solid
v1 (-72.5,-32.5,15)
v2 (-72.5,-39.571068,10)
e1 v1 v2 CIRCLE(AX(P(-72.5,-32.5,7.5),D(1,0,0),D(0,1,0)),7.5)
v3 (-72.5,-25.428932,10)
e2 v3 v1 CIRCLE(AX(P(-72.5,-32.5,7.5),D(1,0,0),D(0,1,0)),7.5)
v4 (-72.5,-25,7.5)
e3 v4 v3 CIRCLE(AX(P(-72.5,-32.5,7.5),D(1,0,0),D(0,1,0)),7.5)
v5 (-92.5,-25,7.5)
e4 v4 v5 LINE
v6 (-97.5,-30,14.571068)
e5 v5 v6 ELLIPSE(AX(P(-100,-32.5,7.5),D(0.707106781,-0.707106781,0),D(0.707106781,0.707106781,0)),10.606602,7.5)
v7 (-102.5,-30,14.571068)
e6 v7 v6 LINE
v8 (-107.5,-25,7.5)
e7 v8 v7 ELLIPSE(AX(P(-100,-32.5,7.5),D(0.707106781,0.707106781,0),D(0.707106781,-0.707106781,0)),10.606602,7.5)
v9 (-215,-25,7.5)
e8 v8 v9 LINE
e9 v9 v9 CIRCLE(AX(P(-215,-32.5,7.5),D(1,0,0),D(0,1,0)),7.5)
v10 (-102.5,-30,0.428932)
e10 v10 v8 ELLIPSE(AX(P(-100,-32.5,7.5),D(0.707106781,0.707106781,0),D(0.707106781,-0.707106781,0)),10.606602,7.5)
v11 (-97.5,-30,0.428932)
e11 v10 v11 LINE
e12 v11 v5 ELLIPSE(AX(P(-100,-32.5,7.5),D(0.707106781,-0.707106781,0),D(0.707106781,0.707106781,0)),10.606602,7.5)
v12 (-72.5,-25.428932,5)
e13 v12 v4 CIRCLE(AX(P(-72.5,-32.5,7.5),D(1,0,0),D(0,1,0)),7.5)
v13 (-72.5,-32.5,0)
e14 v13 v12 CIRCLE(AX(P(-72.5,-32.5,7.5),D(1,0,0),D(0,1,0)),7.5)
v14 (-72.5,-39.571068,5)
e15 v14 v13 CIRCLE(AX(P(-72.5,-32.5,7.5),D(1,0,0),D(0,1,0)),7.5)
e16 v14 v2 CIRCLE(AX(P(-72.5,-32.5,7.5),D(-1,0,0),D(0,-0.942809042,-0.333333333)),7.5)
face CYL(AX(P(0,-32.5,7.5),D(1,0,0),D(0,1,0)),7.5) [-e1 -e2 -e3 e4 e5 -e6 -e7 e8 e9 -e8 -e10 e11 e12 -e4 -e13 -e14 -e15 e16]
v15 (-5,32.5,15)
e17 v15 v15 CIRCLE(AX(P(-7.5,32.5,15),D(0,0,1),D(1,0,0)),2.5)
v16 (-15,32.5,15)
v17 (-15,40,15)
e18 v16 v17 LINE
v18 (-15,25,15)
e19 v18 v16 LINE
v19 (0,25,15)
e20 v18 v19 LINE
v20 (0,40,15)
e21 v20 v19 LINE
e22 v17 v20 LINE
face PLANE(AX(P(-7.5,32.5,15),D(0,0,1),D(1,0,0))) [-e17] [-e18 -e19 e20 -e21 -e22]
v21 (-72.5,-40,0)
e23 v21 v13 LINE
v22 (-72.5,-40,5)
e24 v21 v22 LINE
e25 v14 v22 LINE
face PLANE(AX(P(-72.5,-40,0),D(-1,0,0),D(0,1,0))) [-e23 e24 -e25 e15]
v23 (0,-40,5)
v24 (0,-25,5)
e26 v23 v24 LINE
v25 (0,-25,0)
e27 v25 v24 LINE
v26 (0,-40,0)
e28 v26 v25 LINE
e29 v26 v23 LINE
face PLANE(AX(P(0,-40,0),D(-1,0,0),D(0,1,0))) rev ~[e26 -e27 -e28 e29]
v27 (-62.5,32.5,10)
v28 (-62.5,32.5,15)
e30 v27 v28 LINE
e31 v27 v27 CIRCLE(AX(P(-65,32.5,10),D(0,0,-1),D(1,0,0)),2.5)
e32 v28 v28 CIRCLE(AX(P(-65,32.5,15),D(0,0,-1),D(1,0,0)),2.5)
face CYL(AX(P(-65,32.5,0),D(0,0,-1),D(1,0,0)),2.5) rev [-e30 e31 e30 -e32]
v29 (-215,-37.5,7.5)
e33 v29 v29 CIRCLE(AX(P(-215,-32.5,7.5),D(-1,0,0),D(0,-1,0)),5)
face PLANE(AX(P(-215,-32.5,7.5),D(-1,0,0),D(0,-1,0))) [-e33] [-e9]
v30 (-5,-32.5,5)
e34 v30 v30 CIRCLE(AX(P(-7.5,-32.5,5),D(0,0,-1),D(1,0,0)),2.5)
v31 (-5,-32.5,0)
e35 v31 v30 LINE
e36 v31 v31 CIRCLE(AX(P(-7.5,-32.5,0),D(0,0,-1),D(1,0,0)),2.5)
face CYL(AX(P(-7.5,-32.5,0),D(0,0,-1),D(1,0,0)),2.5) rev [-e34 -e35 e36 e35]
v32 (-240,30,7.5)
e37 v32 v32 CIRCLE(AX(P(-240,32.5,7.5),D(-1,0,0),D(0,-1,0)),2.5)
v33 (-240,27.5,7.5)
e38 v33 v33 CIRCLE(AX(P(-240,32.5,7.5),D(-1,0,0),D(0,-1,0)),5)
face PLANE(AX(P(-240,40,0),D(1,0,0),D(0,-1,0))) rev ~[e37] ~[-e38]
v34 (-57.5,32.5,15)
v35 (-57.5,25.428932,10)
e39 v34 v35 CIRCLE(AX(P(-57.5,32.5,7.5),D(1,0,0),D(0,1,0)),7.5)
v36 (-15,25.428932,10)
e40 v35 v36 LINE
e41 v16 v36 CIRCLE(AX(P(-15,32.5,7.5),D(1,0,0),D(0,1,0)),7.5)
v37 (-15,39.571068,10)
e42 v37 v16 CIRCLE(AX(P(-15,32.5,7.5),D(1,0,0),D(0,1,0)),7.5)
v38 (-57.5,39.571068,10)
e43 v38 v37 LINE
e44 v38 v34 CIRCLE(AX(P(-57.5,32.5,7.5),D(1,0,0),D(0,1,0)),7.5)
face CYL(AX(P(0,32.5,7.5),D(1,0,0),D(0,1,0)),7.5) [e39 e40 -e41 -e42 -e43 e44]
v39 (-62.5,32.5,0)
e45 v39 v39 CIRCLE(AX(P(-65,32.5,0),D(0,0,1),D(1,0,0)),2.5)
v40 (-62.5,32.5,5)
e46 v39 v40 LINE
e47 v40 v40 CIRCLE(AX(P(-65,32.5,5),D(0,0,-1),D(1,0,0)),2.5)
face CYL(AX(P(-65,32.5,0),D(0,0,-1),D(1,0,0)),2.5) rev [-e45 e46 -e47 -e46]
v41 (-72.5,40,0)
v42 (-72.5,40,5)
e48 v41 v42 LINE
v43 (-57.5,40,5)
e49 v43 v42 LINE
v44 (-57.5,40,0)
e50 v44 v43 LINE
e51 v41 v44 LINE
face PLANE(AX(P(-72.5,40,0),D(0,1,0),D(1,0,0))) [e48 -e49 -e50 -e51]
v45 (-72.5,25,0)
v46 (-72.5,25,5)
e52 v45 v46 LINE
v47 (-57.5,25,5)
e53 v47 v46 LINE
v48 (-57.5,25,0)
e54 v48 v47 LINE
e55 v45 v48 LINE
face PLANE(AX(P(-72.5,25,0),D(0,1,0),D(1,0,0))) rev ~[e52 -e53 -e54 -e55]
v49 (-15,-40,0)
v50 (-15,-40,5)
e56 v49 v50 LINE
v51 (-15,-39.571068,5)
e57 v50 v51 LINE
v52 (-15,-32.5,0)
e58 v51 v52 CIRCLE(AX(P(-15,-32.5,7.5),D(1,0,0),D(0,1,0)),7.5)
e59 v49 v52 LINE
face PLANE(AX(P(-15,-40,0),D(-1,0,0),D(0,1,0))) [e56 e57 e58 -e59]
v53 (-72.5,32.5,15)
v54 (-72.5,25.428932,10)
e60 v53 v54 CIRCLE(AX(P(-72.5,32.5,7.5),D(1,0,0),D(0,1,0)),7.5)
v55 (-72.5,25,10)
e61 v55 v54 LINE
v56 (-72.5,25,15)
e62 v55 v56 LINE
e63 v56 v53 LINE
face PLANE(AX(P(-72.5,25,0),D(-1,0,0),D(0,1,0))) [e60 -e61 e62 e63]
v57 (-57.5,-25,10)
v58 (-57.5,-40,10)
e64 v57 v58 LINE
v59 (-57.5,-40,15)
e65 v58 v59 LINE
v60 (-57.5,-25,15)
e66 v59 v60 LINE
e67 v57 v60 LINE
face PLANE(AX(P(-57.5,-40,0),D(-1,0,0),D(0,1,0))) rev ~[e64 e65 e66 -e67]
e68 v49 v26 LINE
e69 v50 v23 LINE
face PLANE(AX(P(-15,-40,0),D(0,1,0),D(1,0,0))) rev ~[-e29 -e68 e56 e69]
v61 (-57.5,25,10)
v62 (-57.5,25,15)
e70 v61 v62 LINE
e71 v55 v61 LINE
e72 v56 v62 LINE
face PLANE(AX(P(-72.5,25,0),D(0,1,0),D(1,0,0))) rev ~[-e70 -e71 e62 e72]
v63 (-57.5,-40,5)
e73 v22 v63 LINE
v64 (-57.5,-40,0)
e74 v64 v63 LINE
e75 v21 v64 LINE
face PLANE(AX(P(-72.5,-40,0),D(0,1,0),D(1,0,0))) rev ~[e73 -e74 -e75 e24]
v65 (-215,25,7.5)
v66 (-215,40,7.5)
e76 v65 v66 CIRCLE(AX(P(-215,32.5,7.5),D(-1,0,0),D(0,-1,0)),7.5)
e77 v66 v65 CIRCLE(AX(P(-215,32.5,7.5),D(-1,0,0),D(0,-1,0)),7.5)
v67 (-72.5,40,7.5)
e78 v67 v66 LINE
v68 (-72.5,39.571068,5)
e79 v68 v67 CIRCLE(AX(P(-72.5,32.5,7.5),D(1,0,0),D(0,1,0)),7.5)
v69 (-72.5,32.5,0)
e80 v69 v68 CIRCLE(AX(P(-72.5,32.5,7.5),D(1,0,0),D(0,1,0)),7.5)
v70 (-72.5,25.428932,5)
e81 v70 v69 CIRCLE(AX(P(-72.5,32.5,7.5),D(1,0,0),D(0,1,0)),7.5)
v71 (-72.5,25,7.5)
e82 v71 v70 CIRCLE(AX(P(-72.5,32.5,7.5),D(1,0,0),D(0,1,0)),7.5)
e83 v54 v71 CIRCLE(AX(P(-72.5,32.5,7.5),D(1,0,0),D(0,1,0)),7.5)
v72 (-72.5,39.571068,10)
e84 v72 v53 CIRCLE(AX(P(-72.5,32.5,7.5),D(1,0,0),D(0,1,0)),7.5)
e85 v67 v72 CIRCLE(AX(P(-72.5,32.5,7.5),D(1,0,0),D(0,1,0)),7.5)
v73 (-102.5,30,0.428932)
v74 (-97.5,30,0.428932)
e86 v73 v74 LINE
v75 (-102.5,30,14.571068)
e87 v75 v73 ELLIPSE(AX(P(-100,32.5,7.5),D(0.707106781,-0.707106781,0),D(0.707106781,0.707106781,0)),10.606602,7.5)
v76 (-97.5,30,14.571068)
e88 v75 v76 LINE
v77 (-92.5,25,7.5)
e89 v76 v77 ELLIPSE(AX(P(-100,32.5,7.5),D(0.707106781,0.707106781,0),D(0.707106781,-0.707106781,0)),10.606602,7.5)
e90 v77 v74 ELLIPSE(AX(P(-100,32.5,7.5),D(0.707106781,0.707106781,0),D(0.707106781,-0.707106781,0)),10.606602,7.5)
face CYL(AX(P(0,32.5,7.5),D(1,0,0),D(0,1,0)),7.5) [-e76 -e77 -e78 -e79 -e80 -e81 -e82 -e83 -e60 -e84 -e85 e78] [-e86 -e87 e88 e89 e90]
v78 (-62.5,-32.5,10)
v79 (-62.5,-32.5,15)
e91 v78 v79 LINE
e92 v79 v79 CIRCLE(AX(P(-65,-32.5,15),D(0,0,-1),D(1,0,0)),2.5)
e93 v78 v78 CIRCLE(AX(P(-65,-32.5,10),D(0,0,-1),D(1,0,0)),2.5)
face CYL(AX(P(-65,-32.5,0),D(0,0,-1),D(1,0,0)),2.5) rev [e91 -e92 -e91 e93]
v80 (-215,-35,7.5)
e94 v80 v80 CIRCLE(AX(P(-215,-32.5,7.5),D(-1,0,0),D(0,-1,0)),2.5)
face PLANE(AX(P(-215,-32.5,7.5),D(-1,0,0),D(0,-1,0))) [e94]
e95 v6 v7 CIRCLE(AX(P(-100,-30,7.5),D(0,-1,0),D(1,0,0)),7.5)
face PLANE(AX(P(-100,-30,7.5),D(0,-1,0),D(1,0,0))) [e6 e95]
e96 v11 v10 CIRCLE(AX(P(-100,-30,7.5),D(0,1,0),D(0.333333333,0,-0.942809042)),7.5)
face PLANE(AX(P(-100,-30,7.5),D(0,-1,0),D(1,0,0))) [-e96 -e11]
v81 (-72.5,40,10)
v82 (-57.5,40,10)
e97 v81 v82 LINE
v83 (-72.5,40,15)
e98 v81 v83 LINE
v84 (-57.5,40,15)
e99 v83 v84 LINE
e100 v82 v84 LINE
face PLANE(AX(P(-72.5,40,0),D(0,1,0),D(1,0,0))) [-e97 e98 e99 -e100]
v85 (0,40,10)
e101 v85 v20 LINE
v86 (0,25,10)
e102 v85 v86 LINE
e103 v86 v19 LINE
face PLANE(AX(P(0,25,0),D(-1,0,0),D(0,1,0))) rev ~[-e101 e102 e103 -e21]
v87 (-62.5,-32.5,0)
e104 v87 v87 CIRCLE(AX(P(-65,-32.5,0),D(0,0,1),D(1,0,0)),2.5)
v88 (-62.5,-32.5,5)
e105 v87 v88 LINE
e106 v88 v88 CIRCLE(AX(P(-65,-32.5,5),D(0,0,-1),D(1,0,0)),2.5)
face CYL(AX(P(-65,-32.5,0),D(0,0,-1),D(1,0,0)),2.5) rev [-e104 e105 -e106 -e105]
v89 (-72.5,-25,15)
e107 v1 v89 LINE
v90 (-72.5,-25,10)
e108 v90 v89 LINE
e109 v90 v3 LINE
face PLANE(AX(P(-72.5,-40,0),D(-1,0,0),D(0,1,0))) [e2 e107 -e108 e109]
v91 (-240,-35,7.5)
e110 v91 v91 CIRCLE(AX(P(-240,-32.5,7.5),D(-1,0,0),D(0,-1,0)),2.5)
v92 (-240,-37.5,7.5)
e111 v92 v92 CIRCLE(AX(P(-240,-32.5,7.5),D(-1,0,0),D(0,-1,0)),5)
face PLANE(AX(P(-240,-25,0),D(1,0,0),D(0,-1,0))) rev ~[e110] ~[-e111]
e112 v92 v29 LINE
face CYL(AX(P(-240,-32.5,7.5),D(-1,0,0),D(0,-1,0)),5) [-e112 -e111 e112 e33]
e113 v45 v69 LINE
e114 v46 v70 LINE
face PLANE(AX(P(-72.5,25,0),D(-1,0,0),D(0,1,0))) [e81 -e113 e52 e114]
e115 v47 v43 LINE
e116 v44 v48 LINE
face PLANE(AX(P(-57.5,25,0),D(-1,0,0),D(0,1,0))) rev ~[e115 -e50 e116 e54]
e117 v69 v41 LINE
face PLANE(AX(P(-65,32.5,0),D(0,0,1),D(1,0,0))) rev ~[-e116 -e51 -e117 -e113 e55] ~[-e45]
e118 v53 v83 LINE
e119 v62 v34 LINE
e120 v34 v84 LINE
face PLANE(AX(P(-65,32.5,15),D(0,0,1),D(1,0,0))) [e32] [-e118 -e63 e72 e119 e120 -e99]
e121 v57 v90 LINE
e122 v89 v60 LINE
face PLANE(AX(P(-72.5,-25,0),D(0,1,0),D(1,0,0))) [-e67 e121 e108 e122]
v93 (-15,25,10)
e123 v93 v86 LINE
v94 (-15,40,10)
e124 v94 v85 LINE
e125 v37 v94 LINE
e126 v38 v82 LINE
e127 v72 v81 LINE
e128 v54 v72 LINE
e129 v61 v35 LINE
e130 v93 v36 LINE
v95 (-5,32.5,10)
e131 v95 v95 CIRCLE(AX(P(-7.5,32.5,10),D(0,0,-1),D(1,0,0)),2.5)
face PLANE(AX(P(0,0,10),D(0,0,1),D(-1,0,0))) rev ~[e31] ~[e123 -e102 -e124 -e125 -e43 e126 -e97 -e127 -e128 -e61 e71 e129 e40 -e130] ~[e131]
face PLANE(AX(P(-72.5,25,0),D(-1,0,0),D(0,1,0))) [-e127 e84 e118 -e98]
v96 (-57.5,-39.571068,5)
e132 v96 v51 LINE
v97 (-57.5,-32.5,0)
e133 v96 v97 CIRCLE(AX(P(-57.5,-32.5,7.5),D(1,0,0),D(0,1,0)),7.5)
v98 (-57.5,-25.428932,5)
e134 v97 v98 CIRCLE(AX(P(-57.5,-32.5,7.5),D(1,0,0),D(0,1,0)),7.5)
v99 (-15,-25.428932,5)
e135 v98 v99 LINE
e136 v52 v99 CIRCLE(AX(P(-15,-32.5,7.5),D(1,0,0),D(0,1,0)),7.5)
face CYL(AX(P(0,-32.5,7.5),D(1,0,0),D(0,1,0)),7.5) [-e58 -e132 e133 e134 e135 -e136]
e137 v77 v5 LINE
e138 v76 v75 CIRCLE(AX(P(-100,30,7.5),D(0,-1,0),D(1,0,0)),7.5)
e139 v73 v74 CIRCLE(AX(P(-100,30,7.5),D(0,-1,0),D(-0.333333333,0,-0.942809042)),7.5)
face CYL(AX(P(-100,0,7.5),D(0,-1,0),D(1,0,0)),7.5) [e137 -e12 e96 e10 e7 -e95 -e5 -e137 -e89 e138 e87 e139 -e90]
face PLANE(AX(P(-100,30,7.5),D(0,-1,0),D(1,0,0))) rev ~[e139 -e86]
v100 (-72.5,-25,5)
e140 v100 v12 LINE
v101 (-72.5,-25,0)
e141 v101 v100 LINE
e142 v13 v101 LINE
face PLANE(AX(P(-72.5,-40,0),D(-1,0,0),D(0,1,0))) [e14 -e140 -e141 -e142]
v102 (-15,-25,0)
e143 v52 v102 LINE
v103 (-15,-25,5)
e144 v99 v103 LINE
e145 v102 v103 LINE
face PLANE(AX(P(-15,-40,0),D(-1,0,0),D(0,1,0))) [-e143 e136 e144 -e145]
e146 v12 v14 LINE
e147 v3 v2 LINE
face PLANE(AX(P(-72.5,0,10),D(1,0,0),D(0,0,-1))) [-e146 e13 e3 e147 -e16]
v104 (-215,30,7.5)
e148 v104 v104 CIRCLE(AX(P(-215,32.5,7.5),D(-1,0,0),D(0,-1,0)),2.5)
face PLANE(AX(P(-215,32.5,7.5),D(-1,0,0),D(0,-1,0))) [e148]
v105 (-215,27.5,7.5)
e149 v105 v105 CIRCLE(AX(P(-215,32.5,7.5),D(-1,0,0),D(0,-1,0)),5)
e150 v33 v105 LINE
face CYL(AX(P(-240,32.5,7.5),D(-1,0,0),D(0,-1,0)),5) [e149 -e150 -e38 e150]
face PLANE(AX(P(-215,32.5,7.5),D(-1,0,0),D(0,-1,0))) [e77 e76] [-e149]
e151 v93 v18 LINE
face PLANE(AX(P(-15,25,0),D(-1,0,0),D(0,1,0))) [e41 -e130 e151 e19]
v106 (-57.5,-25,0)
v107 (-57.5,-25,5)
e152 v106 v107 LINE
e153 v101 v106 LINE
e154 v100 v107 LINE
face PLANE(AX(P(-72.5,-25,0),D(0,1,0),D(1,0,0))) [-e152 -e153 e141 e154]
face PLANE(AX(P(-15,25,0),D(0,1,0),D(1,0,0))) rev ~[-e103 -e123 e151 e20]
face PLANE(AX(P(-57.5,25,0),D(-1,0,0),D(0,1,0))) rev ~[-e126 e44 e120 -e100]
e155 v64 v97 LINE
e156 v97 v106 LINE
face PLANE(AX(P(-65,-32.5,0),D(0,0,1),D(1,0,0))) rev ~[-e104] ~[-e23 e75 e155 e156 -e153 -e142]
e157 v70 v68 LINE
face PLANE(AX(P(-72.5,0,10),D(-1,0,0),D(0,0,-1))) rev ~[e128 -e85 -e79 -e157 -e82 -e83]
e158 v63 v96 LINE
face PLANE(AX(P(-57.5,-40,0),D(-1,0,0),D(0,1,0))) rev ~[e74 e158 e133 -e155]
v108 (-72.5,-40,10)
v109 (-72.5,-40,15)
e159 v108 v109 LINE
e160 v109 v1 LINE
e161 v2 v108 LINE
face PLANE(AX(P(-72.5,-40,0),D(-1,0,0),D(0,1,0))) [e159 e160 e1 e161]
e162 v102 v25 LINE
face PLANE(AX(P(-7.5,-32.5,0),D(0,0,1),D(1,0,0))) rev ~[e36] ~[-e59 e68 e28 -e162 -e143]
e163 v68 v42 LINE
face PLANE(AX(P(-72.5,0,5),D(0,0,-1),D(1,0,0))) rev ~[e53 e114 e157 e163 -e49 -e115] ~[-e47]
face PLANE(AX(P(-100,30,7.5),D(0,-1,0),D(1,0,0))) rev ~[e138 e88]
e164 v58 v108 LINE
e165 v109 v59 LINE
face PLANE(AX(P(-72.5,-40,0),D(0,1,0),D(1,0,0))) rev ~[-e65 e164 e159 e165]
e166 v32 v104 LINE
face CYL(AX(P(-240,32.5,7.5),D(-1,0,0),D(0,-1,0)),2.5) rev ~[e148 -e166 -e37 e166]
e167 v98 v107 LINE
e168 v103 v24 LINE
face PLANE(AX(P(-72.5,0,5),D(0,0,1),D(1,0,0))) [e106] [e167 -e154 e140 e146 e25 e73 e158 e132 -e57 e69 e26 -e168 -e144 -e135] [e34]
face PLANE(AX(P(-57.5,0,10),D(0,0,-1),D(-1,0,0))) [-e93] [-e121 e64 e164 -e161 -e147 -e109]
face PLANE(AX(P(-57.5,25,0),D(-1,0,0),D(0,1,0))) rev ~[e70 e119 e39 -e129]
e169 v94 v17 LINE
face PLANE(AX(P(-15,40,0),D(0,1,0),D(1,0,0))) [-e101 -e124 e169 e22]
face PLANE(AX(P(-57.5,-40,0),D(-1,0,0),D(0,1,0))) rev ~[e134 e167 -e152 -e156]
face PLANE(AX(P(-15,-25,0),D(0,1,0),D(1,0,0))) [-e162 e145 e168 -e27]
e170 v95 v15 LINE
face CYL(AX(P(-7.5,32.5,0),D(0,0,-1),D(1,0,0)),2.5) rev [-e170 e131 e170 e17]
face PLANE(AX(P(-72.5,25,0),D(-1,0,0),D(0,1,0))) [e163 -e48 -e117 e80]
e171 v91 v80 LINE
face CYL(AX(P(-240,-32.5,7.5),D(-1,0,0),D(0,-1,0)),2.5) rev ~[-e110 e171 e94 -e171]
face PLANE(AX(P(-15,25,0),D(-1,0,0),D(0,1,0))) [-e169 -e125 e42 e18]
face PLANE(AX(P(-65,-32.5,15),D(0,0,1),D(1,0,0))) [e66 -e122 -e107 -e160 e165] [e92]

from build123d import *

# Parameters (mm, degrees)
F1_DEPTH      = 15
F2_R          = 7.5
F3_DEPTH      = 240
F4_R          = 7.5
F5_DEPTH      = 30
F5_DEPTH_BACK = 30
F6_W          = 15
F6_H          = 15
F7_DEPTH      = 15
F9_DEPTH      = 40.1
F11_DEPTH     = 54.1
F12_R         = 2.5
F13_DEPTH     = 25
F15_R         = 2.5
F16_DEPTH     = 25
F18_DEPTH     = 25
F17_R         = 7.5
F17_R_2       = 5
F19_DEPTH     = 25


# Not quite as in the source:
# - a feature names something its author has since deleted; it is built from what else it names


with BuildPart() as f1:
    # F0 (on Top) → F1 (new body)
    with BuildSketch(Plane.XY):
        Polygon((-240, -25), (-240, -40), (0, -40), (0, -25), (-100, -25), (-100, 25), (0, 25), (0, 40), (-240, 40), (-240, 25), (-115, 25), (-115, -25), align=None)
    extrude(amount=F1_DEPTH)

    # F2 (on Right) → F3 (intersect)
    with BuildSketch(Plane.YZ):
        with Locations((-32.5, 7.5)):
            Circle(F2_R)
        with Locations((32.5, 7.5)):
            Circle(F2_R)
    extrude(amount=-F3_DEPTH, mode=Mode.INTERSECT)

    # F4 (on Front) → F5 (join, two sides)
    with BuildSketch(Plane.XZ) as f5_sk:
        with Locations((-100, 7.5)):
            Circle(F4_R)
    extrude(amount=F5_DEPTH)
    extrude(f5_sk.sketch, amount=-F5_DEPTH_BACK)

    # F6 (on Top) → F7 (join)
    with BuildSketch(Plane.XY):
        with Locations((-65, 32.5)):
            Rectangle(F6_W, F6_H)
        with Locations((-65, -32.5)):
            Rectangle(F6_W, F6_H)
        with Locations((-7.5, 32.5)):
            Rectangle(F6_W, F6_H)
        with Locations((-7.5, -32.5)):
            Rectangle(F6_W, F6_H)
    extrude(amount=F7_DEPTH)

    # F8 (on Front) → F9 (cut)
    with BuildSketch(Plane.XZ):
        Polygon((0, 0), (0, 10), (-72.5, 10), (-72.5, 5), (-57.5, 5), (-57.5, 0), align=None)
    extrude(amount=-F9_DEPTH, mode=Mode.SUBTRACT)

    # F10 (on Front) → F11 (cut)
    with BuildSketch(Plane.XZ):
        Polygon((0, 5), (0, 15), (-57.5, 15), (-57.5, 10), (-72.5, 10), (-72.5, 5), (-57.5, 5), align=None)
    extrude(amount=F11_DEPTH, mode=Mode.SUBTRACT)

    # F12 (on Top) → F13 (cut)
    with BuildSketch(Plane.XY):
        with Locations((-65, 32.5)):
            Circle(F12_R)
        with Locations((-65, -32.5)):
            Circle(F12_R)
        with Locations((-7.5, -32.5)):
            Circle(F12_R)
        with Locations((-7.5, 32.5)):
            Circle(F12_R)
    extrude(amount=F13_DEPTH, mode=Mode.SUBTRACT)

    # F15 (on offset) → F16 (cut)
    with BuildSketch(Plane(origin=(-240, 0, 0), x_dir=(0, -1, 0), z_dir=(-1, 0, 0))):
        with Locations((-32.5, 7.5)):
            Circle(F15_R)
        with Locations((32.5, 7.5)):
            Circle(F15_R)
    extrude(amount=-F16_DEPTH, mode=Mode.SUBTRACT)

    # F0 (on Top) → F18 (cut)
    with BuildSketch(Plane.XY):
        Polygon((-240, -25), (-240, -40), (0, -40), (0, -25), (-100, -25), (-100, 25), (0, 25), (0, 40), (-240, 40), (-240, 25), (-115, 25), (-115, -25), align=None)
    extrude(amount=-F18_DEPTH, mode=Mode.SUBTRACT)

    # F17 (on offset) → F19 (cut)
    with BuildSketch(Plane(origin=(-240, 0, 0), x_dir=(0, -1, 0), z_dir=(-1, 0, 0))):
        with Locations((-32.5, 7.5)):
            Circle(F17_R)
        with Locations((-32.5, 7.5)):
            Circle(F17_R_2, mode=Mode.SUBTRACT)
        with Locations((32.5, 7.5)):
            Circle(F17_R)
        with Locations((32.5, 7.5)):
            Circle(F17_R_2, mode=Mode.SUBTRACT)
    extrude(amount=-F19_DEPTH, mode=Mode.SUBTRACT)


solid = f1.part
